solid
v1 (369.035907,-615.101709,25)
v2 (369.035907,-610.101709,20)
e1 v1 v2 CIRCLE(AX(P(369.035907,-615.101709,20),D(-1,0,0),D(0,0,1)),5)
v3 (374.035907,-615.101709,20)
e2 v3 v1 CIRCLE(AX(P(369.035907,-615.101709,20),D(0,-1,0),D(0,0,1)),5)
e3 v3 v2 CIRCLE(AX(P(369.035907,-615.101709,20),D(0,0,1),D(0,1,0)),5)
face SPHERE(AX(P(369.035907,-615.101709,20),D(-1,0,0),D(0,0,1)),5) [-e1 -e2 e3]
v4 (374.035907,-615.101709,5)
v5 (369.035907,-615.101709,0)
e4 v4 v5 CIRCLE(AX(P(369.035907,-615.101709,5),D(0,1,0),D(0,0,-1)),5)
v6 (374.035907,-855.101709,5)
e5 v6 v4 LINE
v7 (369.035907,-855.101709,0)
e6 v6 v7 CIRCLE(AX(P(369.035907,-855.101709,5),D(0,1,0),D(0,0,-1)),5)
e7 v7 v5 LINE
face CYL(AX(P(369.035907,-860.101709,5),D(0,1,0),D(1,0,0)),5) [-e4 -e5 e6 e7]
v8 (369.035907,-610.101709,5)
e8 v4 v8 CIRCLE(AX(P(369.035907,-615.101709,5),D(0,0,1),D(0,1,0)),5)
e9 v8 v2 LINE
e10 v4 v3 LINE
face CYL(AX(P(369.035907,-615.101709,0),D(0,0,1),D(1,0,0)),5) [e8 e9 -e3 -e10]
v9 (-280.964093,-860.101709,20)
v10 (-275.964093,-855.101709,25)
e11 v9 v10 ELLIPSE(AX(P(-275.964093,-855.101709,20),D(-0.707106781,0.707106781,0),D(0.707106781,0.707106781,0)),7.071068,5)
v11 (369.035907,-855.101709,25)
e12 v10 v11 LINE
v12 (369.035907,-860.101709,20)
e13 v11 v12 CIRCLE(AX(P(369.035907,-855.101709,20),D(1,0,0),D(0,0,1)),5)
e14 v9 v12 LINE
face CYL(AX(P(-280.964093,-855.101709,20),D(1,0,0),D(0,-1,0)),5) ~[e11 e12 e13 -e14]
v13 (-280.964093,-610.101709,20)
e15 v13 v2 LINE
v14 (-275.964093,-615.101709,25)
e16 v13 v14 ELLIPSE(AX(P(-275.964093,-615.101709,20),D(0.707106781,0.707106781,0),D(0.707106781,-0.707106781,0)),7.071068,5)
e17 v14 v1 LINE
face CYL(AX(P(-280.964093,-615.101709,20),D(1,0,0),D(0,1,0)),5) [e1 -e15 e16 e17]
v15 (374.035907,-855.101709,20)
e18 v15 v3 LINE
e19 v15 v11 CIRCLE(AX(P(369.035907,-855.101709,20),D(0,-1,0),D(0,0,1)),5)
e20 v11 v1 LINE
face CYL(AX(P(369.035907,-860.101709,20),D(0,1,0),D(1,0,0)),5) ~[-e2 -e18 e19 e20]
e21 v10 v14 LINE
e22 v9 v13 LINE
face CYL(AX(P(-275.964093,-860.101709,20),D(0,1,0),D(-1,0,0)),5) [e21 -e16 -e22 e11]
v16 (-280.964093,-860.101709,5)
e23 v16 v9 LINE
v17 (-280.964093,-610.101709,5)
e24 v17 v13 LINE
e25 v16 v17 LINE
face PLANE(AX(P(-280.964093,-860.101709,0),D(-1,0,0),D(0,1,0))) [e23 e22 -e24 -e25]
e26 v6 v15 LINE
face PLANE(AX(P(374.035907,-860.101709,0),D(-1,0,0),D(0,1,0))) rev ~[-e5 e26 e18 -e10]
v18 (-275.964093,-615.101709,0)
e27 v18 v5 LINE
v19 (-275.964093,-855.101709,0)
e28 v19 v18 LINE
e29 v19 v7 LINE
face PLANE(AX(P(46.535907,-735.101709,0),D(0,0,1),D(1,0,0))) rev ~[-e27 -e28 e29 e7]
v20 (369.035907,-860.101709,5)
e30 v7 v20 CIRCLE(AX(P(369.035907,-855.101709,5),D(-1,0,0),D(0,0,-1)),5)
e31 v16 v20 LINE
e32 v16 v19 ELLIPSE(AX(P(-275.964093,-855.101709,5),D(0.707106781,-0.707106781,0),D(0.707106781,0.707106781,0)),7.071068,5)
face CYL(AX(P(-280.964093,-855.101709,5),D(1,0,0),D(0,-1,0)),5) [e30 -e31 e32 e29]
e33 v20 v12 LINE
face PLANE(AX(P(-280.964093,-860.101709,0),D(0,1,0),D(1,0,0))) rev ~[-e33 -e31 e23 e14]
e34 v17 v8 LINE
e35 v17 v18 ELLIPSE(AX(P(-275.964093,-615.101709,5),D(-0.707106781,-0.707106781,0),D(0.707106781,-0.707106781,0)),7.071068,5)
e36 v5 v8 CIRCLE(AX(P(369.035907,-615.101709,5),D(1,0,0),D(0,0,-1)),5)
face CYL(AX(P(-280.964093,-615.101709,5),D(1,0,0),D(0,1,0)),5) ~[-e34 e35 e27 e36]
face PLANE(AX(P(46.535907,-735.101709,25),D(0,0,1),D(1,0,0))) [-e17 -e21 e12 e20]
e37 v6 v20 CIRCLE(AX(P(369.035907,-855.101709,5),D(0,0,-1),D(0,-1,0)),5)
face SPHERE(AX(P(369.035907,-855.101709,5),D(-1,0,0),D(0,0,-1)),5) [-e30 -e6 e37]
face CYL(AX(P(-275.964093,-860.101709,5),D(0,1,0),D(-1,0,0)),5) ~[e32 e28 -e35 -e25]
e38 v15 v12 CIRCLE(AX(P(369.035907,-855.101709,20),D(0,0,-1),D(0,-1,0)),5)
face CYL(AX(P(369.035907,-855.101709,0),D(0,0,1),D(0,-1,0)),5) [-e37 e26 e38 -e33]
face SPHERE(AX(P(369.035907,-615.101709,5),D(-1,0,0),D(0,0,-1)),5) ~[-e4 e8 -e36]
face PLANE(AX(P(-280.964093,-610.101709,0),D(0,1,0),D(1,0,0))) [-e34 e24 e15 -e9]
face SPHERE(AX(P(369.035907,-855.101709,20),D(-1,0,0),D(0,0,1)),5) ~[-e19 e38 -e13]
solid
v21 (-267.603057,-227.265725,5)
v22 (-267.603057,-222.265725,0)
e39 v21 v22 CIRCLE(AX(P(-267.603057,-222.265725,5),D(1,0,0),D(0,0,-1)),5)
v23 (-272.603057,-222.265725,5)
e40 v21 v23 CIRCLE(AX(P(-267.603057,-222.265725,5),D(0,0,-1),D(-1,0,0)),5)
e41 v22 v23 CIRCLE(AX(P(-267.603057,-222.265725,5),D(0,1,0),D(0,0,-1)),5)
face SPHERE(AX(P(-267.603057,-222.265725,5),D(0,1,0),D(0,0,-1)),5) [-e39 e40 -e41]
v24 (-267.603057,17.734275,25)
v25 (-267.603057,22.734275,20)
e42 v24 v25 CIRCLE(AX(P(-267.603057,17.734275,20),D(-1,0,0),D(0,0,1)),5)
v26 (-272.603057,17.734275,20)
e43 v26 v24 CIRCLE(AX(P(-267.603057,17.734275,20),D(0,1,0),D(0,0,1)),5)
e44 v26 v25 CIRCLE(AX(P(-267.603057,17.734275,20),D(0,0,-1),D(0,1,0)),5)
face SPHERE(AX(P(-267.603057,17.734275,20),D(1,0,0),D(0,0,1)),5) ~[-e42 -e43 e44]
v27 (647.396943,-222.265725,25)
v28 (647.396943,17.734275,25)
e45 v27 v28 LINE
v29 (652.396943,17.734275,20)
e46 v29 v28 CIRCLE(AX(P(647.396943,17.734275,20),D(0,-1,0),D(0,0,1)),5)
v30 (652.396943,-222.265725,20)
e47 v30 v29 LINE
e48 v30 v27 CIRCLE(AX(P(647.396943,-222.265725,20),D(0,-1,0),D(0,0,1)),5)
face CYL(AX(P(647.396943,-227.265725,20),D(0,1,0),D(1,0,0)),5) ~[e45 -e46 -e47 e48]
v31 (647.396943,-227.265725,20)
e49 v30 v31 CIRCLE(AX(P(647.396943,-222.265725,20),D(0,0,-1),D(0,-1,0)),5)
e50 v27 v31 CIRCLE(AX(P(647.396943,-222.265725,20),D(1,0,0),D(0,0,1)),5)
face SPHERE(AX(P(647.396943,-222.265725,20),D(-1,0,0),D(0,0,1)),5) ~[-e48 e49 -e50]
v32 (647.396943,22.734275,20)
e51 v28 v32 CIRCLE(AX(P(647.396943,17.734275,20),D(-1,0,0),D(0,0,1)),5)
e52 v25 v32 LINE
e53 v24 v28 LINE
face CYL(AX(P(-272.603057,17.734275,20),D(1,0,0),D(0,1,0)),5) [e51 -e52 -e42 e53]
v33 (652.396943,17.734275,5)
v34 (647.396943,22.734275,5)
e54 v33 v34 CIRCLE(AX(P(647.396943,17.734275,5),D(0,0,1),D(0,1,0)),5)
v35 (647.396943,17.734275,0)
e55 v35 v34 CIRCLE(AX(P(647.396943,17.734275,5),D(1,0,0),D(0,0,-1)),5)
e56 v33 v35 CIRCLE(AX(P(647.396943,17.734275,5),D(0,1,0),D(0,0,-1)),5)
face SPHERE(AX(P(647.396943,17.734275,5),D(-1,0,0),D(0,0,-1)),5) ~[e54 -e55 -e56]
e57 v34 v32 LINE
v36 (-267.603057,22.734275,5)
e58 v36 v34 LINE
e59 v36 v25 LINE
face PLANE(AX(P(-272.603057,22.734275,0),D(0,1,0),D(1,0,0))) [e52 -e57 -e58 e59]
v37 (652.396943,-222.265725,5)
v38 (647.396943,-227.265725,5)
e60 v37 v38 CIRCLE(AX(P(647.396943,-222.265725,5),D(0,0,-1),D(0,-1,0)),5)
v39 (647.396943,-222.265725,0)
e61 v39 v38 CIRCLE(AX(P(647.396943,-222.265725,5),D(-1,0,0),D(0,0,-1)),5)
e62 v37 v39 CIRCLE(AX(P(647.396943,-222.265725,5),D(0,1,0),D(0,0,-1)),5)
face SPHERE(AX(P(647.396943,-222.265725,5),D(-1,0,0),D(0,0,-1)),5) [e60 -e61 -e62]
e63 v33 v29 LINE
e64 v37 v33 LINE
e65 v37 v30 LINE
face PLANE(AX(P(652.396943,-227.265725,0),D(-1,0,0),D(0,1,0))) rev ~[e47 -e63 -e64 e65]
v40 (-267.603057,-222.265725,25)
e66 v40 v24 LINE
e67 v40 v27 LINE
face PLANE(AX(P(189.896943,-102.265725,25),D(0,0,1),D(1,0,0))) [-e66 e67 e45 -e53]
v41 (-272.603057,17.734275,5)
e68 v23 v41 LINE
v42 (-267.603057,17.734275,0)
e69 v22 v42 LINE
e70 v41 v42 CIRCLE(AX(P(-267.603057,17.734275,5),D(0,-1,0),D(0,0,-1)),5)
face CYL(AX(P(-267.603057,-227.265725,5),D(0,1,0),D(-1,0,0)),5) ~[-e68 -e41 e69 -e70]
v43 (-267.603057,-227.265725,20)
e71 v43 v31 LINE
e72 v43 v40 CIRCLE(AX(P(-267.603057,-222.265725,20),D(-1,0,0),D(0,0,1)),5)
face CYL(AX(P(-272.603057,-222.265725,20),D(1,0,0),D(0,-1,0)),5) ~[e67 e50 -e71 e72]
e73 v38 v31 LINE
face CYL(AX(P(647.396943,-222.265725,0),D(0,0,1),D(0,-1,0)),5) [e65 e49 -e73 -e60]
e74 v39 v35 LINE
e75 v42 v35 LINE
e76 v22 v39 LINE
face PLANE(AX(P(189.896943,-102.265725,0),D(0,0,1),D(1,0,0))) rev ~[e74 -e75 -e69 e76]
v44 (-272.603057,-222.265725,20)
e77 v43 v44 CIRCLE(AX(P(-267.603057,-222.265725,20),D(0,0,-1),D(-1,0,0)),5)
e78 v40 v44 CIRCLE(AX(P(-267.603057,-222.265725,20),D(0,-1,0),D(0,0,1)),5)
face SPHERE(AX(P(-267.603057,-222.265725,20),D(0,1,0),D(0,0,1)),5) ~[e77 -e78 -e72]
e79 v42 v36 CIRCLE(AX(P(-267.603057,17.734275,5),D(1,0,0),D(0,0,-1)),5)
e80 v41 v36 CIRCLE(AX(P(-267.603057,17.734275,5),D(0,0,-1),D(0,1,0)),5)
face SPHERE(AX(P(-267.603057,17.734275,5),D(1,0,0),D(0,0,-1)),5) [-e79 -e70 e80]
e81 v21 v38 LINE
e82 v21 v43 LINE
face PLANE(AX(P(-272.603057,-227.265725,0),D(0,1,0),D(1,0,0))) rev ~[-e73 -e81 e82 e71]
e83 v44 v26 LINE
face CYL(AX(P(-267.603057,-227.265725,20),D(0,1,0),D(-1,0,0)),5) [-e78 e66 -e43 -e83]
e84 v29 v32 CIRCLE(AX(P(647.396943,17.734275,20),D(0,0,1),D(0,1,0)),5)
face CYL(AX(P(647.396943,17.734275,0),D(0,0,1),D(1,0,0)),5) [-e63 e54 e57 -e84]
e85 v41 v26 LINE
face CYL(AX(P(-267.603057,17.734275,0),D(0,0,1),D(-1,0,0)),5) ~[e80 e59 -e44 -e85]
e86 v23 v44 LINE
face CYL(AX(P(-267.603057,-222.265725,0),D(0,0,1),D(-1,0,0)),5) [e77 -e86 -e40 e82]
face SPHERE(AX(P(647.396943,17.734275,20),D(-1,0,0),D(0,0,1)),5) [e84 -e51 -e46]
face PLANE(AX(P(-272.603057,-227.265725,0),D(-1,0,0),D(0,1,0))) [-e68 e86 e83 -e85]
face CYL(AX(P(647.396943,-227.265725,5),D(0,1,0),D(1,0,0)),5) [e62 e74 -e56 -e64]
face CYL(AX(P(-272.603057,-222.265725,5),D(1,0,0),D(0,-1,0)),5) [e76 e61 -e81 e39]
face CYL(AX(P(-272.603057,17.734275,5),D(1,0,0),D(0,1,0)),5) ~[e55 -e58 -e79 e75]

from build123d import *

# Parameters (mm, degrees)
F0_W     = 655
F0_H     = 250
F1_DEPTH = 25
F3_DEPTH = 250.001
F4_R     = 5
F5_W     = 925
F5_H     = 250
F6_DEPTH = 25
F7_R     = 5


with BuildPart() as f1:
    # F0 (on Top) → F1 (new body)
    with BuildSketch(Plane.XY):
        with Locations((46.5359067917, -735.1017089717)):
            Rectangle(F0_W, F0_H)
    extrude(amount=F1_DEPTH)

    # F2 (on face) → F3 (cut, through all)
    with BuildSketch(Plane.XZ.offset(860.1017089717)):
        Polygon((-329.5351266861, 5.0213485956), (-321.2029933929, 5.0213038921), (-293.8260436058, 27.9015563428), (-329.5351266861, 27.9015563428), align=None)
    extrude(amount=-F3_DEPTH, mode=Mode.SUBTRACT)

    # F4
    f4_edges = [f1.edges().sort_by_distance(p)[0] for p in [
        (46.535907, -610.101709, 25),
        (-280.964093, -735.101709, 25),
        (46.535907, -860.101709, 25),
        (374.035907, -735.101709, 25),
        (46.535907, -610.101709, 0),
        (-280.964093, -735.101709, 0),
        (46.535907, -860.101709, 0),
        (374.035907, -735.101709, 0),
        (374.035907, -860.101709, 12.5),
        (374.035907, -610.101709, 12.5),
    ]]
    fillet(f4_edges, radius=F4_R)


with BuildPart() as f6:
    # F5 (on Top) → F6 (new body)
    with BuildSketch(Plane.XY):
        with Locations((189.8969432941, -102.2657254338)):
            Rectangle(F5_W, F5_H)
    extrude(amount=F6_DEPTH)

    # F7
    f7_edges = [f6.edges().sort_by_distance(p)[0] for p in [
        (189.896943, 22.734275, 25),
        (-272.603057, -102.265725, 25),
        (189.896943, -227.265725, 25),
        (652.396943, -102.265725, 25),
        (189.896943, 22.734275, 0),
        (-272.603057, -102.265725, 0),
        (189.896943, -227.265725, 0),
        (652.396943, -102.265725, 0),
        (652.396943, 22.734275, 12.5),
        (-272.603057, 22.734275, 12.5),
        (-272.603057, -227.265725, 12.5),
        (652.396943, -227.265725, 12.5),
    ]]
    fillet(f7_edges, radius=F7_R)


solid = Compound([f1.part, f6.part])
